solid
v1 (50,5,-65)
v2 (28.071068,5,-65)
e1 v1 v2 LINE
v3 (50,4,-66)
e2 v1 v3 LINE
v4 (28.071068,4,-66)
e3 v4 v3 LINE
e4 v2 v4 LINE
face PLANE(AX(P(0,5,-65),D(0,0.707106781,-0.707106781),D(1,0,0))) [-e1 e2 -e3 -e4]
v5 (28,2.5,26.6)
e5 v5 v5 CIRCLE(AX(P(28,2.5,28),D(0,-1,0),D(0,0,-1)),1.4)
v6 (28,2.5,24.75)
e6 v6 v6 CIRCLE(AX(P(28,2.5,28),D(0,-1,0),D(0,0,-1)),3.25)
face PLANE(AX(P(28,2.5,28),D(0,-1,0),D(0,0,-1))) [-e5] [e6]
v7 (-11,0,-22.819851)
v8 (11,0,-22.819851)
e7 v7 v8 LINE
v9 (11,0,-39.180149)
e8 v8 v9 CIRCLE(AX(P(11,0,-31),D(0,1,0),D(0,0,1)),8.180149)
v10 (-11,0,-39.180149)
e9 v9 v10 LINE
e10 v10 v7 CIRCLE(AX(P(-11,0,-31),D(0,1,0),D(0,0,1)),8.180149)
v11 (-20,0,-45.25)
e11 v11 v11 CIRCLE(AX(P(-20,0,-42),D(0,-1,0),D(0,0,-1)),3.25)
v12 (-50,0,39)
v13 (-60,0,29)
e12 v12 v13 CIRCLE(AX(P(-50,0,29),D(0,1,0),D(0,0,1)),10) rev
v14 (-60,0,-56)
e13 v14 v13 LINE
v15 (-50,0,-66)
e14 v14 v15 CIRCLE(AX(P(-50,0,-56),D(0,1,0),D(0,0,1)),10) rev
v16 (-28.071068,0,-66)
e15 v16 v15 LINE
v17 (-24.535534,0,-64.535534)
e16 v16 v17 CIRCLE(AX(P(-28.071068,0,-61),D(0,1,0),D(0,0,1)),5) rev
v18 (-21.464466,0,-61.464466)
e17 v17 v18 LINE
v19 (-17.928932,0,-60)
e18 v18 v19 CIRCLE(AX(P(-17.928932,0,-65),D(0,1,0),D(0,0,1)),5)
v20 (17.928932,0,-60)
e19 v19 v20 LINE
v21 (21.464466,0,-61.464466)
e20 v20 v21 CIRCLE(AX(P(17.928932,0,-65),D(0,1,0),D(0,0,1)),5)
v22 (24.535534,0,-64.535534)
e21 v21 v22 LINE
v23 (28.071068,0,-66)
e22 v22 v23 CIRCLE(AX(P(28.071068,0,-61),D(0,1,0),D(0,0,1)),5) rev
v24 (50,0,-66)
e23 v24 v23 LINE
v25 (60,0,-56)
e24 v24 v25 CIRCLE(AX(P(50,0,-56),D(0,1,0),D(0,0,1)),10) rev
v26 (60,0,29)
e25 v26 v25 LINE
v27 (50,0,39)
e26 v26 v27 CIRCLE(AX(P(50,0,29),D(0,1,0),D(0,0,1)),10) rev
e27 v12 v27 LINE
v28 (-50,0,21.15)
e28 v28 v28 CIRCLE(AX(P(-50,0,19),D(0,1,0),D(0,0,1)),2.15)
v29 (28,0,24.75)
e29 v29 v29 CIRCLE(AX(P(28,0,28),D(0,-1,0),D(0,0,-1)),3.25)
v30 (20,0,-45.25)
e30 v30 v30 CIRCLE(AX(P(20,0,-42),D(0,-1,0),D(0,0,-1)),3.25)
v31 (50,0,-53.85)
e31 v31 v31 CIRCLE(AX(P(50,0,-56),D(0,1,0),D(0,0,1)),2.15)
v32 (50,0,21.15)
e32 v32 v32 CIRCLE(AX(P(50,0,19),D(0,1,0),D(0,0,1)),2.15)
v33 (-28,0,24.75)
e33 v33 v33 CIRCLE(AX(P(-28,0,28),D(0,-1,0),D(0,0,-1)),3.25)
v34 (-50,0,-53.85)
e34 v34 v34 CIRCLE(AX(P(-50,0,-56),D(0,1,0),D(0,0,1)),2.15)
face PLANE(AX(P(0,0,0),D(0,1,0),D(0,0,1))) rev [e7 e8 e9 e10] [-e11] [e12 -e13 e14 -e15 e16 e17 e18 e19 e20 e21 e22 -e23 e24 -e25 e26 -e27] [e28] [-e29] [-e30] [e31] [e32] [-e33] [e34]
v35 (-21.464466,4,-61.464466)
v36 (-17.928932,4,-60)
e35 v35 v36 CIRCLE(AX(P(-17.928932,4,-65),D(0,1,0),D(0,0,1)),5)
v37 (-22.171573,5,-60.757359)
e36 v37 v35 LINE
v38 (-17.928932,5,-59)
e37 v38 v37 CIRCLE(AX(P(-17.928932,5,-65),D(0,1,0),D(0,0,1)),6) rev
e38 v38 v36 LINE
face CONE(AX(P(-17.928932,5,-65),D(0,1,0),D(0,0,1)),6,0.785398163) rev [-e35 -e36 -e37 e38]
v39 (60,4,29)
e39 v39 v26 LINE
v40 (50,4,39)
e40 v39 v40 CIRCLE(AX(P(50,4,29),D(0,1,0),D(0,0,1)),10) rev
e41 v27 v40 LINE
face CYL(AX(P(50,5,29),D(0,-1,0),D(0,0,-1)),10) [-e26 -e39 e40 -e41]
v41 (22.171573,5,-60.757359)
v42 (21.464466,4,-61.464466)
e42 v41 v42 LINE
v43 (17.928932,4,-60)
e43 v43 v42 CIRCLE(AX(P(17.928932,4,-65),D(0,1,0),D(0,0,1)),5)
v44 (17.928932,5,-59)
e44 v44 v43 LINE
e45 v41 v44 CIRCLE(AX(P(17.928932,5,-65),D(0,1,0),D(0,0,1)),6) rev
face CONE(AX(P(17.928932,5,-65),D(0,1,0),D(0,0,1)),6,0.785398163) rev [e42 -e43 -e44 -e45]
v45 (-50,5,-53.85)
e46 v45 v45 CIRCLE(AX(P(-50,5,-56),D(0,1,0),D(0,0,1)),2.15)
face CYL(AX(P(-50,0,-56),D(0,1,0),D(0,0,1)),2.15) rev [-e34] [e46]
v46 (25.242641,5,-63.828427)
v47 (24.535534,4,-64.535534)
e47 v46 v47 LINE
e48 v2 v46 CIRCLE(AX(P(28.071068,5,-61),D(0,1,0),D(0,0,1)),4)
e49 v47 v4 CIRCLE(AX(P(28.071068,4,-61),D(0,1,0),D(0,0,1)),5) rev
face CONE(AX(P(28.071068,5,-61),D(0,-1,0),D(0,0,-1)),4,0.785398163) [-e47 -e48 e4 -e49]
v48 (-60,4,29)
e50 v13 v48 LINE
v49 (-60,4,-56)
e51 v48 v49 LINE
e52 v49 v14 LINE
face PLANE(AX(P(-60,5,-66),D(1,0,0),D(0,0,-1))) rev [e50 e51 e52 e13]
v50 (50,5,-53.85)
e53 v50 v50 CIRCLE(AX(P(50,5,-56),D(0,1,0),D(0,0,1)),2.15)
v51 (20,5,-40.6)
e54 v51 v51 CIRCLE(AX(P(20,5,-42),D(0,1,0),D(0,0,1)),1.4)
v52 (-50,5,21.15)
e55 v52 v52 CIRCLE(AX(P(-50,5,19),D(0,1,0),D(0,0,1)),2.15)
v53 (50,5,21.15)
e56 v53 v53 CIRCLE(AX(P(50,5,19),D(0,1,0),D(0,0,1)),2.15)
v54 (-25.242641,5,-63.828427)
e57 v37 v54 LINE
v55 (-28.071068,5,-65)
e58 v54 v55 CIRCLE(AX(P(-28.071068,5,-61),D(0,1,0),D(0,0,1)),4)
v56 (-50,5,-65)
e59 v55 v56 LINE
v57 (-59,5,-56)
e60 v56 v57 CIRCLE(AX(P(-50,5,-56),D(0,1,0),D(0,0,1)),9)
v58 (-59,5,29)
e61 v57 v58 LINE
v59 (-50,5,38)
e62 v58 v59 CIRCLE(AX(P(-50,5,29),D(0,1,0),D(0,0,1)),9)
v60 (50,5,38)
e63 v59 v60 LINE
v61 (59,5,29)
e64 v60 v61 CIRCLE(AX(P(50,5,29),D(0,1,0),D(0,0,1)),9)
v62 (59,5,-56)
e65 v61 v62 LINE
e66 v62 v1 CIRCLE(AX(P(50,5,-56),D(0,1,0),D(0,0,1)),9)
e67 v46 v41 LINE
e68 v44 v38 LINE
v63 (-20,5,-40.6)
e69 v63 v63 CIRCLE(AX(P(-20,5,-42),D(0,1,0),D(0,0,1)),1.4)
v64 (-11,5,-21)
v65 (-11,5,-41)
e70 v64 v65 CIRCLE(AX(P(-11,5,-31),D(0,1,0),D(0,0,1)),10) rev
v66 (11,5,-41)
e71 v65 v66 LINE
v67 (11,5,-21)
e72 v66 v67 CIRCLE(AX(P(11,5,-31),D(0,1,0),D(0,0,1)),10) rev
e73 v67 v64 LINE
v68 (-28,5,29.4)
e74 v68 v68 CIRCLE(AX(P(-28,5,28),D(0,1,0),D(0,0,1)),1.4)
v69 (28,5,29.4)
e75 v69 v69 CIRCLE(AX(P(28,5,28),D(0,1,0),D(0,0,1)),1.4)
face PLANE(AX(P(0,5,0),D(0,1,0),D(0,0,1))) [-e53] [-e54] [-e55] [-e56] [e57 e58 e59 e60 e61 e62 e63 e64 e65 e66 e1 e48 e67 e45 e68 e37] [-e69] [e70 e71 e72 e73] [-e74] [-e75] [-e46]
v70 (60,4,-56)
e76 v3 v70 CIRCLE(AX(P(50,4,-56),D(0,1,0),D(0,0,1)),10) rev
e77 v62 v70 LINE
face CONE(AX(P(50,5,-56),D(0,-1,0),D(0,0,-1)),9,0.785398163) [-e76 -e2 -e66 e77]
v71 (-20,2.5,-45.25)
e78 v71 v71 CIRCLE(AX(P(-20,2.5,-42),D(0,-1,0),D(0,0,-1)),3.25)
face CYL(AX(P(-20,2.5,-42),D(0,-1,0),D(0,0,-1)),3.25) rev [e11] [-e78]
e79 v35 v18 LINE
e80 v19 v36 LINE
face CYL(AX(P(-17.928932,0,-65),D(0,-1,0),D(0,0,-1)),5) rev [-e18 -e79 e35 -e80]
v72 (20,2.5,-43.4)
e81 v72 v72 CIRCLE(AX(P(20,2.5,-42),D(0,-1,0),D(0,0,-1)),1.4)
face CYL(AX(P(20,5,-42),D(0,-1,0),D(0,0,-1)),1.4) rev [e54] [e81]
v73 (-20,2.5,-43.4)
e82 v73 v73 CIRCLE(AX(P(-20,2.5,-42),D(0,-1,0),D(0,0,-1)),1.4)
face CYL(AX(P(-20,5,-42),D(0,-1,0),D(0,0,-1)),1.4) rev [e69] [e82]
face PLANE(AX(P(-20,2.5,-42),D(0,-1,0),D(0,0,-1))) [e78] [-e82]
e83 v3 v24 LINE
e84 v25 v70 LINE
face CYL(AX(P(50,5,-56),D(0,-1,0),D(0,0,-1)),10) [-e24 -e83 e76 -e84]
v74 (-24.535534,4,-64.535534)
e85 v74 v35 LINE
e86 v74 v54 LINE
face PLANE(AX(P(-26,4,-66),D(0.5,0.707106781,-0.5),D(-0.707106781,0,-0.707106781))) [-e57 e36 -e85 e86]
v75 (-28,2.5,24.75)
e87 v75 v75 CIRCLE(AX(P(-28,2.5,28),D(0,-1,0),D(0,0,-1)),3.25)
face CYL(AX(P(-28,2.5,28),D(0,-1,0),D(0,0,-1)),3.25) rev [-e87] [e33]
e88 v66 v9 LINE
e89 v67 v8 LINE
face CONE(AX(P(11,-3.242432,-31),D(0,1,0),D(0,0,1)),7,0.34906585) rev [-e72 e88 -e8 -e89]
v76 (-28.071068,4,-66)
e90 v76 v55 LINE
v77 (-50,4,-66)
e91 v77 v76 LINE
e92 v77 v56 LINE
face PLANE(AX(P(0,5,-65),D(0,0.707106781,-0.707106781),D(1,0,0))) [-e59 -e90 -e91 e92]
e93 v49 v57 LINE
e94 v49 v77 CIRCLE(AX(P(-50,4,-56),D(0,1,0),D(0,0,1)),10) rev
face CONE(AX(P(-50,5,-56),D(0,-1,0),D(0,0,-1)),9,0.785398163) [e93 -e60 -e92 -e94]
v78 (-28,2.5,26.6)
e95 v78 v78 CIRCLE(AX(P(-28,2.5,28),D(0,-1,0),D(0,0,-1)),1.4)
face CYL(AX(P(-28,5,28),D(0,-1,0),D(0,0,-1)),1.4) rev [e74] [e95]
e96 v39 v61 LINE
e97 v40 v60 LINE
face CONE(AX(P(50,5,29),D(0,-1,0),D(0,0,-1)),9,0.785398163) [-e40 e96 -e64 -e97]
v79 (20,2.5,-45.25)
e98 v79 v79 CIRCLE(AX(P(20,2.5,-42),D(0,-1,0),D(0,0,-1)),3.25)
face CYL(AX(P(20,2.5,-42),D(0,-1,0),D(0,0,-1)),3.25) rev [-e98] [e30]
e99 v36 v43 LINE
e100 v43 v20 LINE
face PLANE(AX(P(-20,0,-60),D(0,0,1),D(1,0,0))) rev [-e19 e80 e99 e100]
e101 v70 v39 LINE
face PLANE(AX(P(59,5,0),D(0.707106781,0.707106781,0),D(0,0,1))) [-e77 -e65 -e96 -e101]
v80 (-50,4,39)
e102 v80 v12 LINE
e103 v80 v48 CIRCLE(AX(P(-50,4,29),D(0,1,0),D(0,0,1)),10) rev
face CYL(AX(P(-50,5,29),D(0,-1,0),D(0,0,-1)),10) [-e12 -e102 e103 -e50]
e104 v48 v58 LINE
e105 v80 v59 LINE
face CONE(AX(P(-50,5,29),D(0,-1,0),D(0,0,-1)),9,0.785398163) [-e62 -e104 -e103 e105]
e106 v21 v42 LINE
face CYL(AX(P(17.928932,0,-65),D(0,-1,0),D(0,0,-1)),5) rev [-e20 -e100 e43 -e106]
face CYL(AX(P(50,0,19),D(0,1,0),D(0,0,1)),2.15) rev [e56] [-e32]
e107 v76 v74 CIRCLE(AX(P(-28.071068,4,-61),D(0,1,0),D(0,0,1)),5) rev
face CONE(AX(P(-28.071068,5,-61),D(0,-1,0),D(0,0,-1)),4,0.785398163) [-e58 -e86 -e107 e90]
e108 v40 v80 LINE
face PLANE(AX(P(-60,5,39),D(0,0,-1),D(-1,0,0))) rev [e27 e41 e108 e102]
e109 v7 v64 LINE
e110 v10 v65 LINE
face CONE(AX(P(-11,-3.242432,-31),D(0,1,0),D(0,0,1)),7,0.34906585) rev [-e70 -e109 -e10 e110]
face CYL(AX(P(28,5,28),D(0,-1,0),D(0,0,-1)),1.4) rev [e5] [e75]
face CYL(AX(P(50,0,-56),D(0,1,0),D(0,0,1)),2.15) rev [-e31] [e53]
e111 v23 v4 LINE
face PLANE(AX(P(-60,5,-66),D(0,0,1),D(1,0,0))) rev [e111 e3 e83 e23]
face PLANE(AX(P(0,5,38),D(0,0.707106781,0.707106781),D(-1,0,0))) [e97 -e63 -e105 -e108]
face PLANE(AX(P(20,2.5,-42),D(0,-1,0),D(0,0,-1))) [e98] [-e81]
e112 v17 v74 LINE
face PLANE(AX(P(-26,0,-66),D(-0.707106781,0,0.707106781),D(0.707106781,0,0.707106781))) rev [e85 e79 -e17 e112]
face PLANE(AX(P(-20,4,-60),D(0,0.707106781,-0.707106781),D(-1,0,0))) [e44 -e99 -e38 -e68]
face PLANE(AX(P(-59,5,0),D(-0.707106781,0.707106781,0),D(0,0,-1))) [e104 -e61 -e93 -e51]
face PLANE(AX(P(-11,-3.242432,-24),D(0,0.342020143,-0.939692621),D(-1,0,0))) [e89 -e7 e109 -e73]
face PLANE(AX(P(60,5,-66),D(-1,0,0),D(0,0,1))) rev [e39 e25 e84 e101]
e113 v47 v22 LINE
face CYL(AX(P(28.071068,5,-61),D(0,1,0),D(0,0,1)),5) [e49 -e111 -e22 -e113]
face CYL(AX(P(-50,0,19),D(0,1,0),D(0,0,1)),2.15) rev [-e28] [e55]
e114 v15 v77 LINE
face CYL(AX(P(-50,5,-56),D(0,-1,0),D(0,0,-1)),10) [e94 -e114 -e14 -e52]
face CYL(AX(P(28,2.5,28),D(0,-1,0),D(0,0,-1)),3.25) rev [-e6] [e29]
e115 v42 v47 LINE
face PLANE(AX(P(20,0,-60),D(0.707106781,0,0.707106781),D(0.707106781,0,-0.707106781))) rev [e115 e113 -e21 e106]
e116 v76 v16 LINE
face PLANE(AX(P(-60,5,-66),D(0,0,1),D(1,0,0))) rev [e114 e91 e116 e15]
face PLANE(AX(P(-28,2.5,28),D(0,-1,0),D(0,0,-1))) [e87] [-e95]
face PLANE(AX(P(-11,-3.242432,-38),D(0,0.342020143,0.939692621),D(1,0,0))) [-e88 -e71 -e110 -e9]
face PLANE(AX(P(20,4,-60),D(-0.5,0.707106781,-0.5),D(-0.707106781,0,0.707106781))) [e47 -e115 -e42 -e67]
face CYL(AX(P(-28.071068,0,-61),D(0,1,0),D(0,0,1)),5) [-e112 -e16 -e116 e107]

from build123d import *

# Parameters (mm, degrees)
SKETCH2_W           = 120
SKETCH2_H           = 105
SKETCH2_R           = 1.4
BOSS_EXTRUDE2_DEPTH = 5
CUT_EXTRUDE13_DEPTH = 90.336442732
FILLET6_R           = 5
FILLET5_R           = 10
CHAMFER4_SIZE       = 1
SKETCH11_R          = 2.15
CUT_EXTRUDE10_DEPTH = 90.336442732
SKETCH13_R          = 3.25
CUT_EXTRUDE12_DEPTH = 2.5
CUT_EXTRUDE14_DEPTH = 90.336442732
CHAMFER5_SIZE       = 3
CHAMFER5_SIZE_2     = 8.242432258


with BuildPart() as part:
    # Sketch2 → Boss-Extrude2 (new body)
    with BuildSketch(Plane(origin=(0, 0, 0), x_dir=(1, 0, 0), z_dir=(0, 1, 0))):
        with Locations((0, 13.5)):
            Rectangle(SKETCH2_W, SKETCH2_H)
        with Locations(Location((-28, -28, 0), (0, 0, 270))):
            Circle(SKETCH2_R, mode=Mode.SUBTRACT)
        with Locations(Location((28, -28, 0), (0, 0, 270))):
            Circle(SKETCH2_R, mode=Mode.SUBTRACT)
        with Locations(Location((20, 42, 0), (0, 0, 270))):
            Circle(SKETCH2_R, mode=Mode.SUBTRACT)
        with Locations(Location((-20, 42, 0), (0, 0, 270))):
            Circle(SKETCH2_R, mode=Mode.SUBTRACT)
    extrude(amount=BOSS_EXTRUDE2_DEPTH)

    # Sketch9 → Cut-Extrude13 (cut, through all)
    with BuildSketch(Plane(origin=(0, 5, 0), x_dir=(1, 0, 0), z_dir=(0, 1, 0))):
        Polygon((-26, 66), (-20, 60), (20, 60), (26, 66), align=None)
    extrude(amount=-CUT_EXTRUDE13_DEPTH, mode=Mode.SUBTRACT)

    # Fillet6
    fillet6_edges = [part.edges().sort_by_distance(p)[0] for p in [
        (-26, 2.5, -66),
        (26, 2.5, -66),
        (20, 2.5, -60),
        (-20, 2.5, -60),
    ]]
    fillet(fillet6_edges, radius=FILLET6_R)

    # Fillet5
    fillet5_edges = [part.edges().sort_by_distance(p)[0] for p in [
        (-60, 2.5, -66),
        (60, 2.5, -66),
        (60, 2.5, 39),
        (-60, 2.5, 39),
    ]]
    fillet(fillet5_edges, radius=FILLET5_R)

    # Chamfer4
    chamfer4_edges = [part.edges().sort_by_distance(p)[0] for p in [
        (23, 5, -63),
        (0, 5, -60),
        (-23, 5, -63),
        (-39.035533906, 5, -66),
        (-26.15765065, 5, -65.619397663),
        (26.15765065, 5, -65.619397663),
        (19.84234935, 5, -60.380602337),
        (-19.84234935, 5, -60.380602337),
        (-60, 5, -13.5),
        (39.035533906, 5, -66),
        (0, 5, 39),
        (60, 5, -13.5),
        (-57.071067812, 5, 36.071067812),
        (57.071067812, 5, 36.071067812),
        (57.071067812, 5, -63.071067812),
        (-57.071067812, 5, -63.071067812),
    ]]
    chamfer(chamfer4_edges, length=CHAMFER4_SIZE)

    # Sketch11 → Cut-Extrude10 (cut, through all)
    with BuildSketch(Plane(origin=(0, 5, 0), x_dir=(1, 0, 0), z_dir=(0, 1, 0))):
        with Locations(Location((-50, 56, 0), (0, 0, 270))):
            Circle(SKETCH11_R)
        with Locations(Location((50, 56, 0), (0, 0, 270))):
            Circle(SKETCH11_R)
        with Locations(Location((-50, -19, 0), (0, 0, 270))):
            Circle(SKETCH11_R)
        with Locations(Location((50, -19, 0), (0, 0, 270))):
            Circle(SKETCH11_R)
    extrude(amount=-CUT_EXTRUDE10_DEPTH, mode=Mode.SUBTRACT)

    # Sketch13 → Cut-Extrude12 (cut)
    with BuildSketch(Plane.XZ):
        with Locations(Location((-28, 28, 0), (0, 0, 270))):
            Circle(SKETCH13_R)
        with Locations(Location((28, 28, 0), (0, 0, 270))):
            Circle(SKETCH13_R)
        with Locations(Location((-20, -42, 0), (0, 0, 270))):
            Circle(SKETCH13_R)
        with Locations(Location((20, -42, 0), (0, 0, 270))):
            Circle(SKETCH13_R)
    extrude(amount=-CUT_EXTRUDE12_DEPTH, mode=Mode.SUBTRACT)

    # Sketch14 → Cut-Extrude14 (cut, through all)
    with BuildSketch(Plane(origin=(0, 5, 0), x_dir=(1, 0, 0), z_dir=(0, 1, 0))):
        with BuildLine():
            Line((-11, 38), (11, 38))
            ThreePointArc((11, 38), (18, 31), (11, 24))
            Line((11, 24), (-11, 24))
            ThreePointArc((-11, 24), (-18, 31), (-11, 38))
        make_face()
    extrude(amount=-CUT_EXTRUDE14_DEPTH, mode=Mode.SUBTRACT)

    # Chamfer5
    # the kernel refuses this chamfer: 8.242432258, 3 mm, written as the material it takes off along each edge
    with BuildSketch(Plane(origin=(11, 5, -24), x_dir=(0, 0.09904090225205062, 0.9950833631817486), z_dir=(-1, 0, 0)), Plane(origin=(-11, 5, -38), x_dir=(0, 0.09904090225205073, -0.9950833631817486), z_dir=(1, 0, 0))) as chamfer5_piece_1:
        Polygon((CHAMFER5_SIZE * 0.995083363182, -CHAMFER5_SIZE * 0.0990409022521), (-CHAMFER5_SIZE_2 * 0.0990409022564, -CHAMFER5_SIZE_2 * 0.995083363226), (0, 0), align=None)
    extrude(amount=22, mode=Mode.SUBTRACT)
    with BuildSketch(Plane(origin=(11, 5, -31), x_dir=(0, 0, -1), z_dir=(-1, 0, 0))) as chamfer5_piece_2:
        Polygon((7 + CHAMFER5_SIZE, 0), (7, CHAMFER5_SIZE_2), (7, 0), align=None)
    revolve(axis=Axis((11, 5, -31), (0, -1, 0)), revolution_arc=180, mode=Mode.SUBTRACT)
    with BuildSketch(Plane(origin=(-11, 5, -31), x_dir=(0, 0, 1), z_dir=(1, 0, 0))) as chamfer5_piece_3:
        Polygon((7 + CHAMFER5_SIZE, 0), (7, CHAMFER5_SIZE_2), (7, 0), align=None)
    revolve(axis=Axis((-11, 5, -31), (0, -1, 0)), revolution_arc=180, mode=Mode.SUBTRACT)


solid = part.part
